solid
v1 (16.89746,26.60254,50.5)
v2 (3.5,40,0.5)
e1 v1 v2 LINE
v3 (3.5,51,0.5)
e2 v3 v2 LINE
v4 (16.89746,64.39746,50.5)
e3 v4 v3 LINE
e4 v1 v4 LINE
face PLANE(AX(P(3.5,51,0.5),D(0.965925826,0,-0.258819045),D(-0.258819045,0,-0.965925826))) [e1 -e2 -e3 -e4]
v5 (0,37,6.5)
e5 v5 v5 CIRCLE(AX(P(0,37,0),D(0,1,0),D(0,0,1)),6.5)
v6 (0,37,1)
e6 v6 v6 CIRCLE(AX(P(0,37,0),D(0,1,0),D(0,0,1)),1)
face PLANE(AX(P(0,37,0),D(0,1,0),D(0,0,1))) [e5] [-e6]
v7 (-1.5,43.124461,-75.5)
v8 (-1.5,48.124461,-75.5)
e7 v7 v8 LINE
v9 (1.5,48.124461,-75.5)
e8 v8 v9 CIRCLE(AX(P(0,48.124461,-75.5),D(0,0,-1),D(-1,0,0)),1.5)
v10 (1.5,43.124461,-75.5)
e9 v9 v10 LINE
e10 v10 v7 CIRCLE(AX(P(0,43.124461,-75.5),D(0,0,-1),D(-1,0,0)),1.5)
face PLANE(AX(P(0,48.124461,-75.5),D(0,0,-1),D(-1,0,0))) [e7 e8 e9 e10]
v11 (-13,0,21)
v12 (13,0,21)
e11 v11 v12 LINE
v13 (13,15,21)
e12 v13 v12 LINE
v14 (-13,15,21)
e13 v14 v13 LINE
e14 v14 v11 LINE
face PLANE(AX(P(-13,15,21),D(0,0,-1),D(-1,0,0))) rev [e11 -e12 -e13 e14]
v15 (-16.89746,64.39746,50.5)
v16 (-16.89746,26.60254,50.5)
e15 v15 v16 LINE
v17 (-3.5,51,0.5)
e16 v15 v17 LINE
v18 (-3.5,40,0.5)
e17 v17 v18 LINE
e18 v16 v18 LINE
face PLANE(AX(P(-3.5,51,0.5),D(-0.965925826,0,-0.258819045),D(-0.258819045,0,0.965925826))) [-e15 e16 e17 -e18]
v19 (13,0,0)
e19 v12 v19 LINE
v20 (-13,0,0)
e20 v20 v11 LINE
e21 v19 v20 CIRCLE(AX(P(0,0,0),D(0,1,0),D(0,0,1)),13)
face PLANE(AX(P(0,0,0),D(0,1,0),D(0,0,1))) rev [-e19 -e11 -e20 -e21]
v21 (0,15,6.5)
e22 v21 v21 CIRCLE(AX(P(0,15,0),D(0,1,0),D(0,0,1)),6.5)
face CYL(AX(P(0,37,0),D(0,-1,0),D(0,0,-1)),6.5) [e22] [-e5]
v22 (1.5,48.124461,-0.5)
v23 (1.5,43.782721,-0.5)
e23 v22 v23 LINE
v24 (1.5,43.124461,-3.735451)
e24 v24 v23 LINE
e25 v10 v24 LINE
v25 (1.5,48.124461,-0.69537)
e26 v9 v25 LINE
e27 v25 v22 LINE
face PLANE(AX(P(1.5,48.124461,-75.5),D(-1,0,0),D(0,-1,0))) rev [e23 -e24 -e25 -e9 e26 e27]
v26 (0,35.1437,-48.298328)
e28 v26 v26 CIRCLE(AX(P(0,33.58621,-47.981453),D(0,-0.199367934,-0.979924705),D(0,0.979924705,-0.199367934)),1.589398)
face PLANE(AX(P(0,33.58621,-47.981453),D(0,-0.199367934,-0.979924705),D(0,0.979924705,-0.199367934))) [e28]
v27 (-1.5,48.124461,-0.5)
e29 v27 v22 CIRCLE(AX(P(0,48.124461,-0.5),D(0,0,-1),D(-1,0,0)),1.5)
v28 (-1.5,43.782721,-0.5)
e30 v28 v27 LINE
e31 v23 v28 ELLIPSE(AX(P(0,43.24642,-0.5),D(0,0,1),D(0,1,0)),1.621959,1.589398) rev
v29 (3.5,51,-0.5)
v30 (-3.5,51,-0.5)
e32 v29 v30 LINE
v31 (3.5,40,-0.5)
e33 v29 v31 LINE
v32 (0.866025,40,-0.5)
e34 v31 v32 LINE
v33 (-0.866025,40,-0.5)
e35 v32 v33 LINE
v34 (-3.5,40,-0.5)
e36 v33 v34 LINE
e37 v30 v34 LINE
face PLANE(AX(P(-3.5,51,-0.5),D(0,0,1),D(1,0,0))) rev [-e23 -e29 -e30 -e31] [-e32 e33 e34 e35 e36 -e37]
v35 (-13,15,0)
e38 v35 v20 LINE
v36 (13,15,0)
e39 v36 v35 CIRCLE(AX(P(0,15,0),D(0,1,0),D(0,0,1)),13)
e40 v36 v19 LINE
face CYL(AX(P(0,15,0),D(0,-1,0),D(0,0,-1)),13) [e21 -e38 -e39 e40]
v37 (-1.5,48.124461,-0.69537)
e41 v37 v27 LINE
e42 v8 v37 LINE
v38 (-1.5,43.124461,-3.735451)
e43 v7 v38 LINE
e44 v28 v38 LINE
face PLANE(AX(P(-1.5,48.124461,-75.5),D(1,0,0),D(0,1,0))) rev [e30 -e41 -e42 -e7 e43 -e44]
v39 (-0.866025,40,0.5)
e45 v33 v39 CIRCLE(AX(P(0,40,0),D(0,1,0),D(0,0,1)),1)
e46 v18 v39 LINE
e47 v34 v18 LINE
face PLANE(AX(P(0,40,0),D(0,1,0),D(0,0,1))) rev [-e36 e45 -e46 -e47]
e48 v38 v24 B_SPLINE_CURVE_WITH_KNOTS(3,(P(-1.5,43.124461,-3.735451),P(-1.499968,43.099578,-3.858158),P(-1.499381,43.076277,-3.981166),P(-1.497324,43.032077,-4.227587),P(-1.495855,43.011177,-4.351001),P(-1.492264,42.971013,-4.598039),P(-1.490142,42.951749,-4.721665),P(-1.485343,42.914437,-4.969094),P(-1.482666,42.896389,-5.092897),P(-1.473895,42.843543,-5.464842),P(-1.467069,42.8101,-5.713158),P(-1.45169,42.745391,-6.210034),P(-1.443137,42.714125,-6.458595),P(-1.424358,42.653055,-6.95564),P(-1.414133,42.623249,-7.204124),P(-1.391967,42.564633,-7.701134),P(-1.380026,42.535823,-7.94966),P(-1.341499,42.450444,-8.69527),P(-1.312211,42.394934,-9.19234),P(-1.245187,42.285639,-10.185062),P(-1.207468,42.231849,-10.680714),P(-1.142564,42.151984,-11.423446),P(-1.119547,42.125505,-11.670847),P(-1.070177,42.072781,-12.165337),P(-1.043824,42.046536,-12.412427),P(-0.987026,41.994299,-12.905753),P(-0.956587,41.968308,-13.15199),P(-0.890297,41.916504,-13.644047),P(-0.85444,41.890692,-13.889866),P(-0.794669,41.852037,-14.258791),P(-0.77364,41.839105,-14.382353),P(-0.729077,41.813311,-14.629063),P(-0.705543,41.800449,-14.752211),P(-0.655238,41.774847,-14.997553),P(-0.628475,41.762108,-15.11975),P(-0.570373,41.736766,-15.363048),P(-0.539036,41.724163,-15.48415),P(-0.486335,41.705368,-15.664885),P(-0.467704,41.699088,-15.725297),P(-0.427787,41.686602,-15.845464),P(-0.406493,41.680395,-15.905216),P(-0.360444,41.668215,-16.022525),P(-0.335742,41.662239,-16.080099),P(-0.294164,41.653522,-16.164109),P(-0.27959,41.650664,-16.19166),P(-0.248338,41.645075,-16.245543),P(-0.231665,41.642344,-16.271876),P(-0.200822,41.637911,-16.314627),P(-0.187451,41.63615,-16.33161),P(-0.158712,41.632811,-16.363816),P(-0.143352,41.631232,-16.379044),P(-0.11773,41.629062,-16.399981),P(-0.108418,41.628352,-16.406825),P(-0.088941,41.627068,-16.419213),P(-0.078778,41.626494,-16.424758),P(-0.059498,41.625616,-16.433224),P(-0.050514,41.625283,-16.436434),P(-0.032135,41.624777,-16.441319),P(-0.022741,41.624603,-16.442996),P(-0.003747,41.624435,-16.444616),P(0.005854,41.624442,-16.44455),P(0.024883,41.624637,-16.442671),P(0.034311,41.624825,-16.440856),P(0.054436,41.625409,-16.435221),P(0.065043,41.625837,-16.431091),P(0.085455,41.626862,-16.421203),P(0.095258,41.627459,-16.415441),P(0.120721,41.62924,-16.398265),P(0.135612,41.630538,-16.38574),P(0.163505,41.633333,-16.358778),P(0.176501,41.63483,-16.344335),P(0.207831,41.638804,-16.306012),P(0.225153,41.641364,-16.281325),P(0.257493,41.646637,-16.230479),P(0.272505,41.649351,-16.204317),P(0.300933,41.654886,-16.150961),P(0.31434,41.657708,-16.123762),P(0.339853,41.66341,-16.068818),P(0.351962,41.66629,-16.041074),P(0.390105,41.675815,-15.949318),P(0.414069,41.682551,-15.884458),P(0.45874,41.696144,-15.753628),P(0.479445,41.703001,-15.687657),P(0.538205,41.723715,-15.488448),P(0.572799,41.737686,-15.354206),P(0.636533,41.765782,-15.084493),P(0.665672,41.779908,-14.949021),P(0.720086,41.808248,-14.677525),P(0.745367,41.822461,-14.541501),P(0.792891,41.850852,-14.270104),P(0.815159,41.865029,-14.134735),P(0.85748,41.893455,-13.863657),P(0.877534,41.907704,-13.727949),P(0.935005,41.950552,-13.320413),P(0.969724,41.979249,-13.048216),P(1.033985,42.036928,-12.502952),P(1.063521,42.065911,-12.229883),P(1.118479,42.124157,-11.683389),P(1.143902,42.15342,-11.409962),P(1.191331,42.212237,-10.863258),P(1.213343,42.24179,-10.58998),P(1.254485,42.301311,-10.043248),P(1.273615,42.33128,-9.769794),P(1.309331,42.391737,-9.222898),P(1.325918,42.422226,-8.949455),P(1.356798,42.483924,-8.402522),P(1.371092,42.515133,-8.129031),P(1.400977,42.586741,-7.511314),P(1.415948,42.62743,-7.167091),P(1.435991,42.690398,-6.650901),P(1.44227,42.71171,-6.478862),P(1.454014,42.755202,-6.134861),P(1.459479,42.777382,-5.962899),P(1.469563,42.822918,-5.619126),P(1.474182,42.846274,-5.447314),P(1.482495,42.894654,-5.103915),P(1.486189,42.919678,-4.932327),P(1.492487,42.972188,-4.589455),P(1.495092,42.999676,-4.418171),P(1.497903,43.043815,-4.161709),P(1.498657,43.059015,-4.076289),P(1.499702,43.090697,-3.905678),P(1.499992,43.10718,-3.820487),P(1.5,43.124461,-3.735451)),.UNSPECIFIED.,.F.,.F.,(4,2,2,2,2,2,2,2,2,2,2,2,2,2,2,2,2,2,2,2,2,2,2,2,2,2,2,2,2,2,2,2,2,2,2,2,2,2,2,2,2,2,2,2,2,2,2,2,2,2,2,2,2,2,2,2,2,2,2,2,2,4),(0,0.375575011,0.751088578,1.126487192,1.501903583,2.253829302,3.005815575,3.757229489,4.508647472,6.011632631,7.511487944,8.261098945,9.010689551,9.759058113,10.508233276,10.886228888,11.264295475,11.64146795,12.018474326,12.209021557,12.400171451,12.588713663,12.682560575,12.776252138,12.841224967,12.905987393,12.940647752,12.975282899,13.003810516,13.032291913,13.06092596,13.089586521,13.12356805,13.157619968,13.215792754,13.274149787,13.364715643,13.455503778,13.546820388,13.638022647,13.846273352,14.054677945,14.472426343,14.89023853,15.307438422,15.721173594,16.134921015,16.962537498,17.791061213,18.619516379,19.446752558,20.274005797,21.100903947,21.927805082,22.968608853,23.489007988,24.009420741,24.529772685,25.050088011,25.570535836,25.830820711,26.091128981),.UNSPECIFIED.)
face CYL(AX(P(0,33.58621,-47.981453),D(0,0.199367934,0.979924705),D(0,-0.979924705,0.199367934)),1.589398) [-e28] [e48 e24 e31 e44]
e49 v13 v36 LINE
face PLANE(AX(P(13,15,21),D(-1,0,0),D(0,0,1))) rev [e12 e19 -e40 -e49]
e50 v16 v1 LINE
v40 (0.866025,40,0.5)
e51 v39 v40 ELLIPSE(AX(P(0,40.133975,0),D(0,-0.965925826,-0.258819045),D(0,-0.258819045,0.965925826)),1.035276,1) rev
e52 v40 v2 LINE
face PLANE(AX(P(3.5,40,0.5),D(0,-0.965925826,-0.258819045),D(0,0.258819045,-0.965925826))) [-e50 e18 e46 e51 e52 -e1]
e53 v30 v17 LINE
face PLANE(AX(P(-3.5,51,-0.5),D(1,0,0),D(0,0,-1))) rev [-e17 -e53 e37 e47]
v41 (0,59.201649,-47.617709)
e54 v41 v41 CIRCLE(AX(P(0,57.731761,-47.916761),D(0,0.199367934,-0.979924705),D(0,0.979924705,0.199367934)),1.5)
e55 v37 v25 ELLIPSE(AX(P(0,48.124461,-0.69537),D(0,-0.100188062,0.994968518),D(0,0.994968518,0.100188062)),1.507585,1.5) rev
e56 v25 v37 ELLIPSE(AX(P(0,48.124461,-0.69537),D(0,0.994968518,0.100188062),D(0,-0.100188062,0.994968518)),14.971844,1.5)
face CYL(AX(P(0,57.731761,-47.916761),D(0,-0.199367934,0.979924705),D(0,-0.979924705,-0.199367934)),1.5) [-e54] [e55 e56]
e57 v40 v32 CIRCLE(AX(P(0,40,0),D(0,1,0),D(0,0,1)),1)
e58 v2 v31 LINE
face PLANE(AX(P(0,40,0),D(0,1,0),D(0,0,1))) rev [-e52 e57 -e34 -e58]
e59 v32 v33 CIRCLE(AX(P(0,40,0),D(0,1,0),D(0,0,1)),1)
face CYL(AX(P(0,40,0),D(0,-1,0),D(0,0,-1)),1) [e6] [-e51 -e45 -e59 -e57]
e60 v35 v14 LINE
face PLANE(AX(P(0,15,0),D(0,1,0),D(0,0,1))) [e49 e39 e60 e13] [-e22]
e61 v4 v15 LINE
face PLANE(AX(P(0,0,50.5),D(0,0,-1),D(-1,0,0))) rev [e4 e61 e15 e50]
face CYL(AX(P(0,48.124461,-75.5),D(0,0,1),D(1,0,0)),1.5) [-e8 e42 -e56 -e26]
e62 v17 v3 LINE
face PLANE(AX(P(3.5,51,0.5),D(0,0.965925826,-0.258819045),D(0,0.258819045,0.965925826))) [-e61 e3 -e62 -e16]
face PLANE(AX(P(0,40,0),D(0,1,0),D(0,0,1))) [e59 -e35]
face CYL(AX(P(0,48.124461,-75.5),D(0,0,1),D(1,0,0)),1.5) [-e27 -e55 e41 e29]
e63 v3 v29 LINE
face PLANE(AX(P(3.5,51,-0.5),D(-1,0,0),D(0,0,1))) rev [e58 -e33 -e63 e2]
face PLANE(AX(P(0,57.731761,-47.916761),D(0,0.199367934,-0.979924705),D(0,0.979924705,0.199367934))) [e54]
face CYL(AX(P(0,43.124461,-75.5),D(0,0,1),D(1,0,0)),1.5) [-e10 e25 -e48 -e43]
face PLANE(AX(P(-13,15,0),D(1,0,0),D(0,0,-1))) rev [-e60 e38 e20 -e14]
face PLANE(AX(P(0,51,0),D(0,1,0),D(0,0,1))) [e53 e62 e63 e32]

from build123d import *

# Parameters (mm, degrees)
BOSS_EXTRUDE1_DEPTH = 15
SKETCH2_R           = 6.5
BOSS_EXTRUDE2_DEPTH = 22
SKETCH3_R           = 1
BOSS_EXTRUDE3_DEPTH = 3
SKETCH4_W           = 7
SKETCH4_H           = 1
BOSS_EXTRUDE4_DEPTH = 11
SKETCH5_R           = 1.5
BOSS_EXTRUDE5_DEPTH = 20
BOSS_EXTRUDE6_DEPTH = 75
SKETCH7_R           = 1.589398049
BOSS_EXTRUDE7_DEPTH = 50
SKETCH8_R           = 1.5
BOSS_EXTRUDE8_DEPTH = 50
SKETCH9_W           = 7
SKETCH9_H           = 11
BOSS_EXTRUDE9_DEPTH = 50
BOSS_EXTRUDE9_TAPER = -15


with BuildPart() as part:
    # Sketch1 → Boss-Extrude1 (new body)
    with BuildSketch(Plane(origin=(0, 0, 0), x_dir=(1, 0, 0), z_dir=(0, 1, 0))):
        with BuildLine():
            Line((-13, 0), (-13, -21))
            Line((-13, -21), (13, -21))
            Line((13, -21), (13, 0))
            ThreePointArc((13, 0), (0, 13), (-13, 0))
        make_face()
    extrude(amount=BOSS_EXTRUDE1_DEPTH)

    # Sketch2 → Boss-Extrude2 (add)
    with BuildSketch(Plane(origin=(0, 15, 0), x_dir=(1, 0, 0), z_dir=(0, 1, 0))):
        Circle(SKETCH2_R)
    extrude(amount=BOSS_EXTRUDE2_DEPTH)

    # Sketch3 → Boss-Extrude3 (add)
    with BuildSketch(Plane(origin=(0, 37, 0), x_dir=(1, 0, 0), z_dir=(0, 1, 0))):
        Circle(SKETCH3_R)
    extrude(amount=BOSS_EXTRUDE3_DEPTH)

    # Sketch4 → Boss-Extrude4 (add)
    with BuildSketch(Plane(origin=(0, 40, 0), x_dir=(1, 0, 0), z_dir=(0, 1, 0))):
        Rectangle(SKETCH4_W, SKETCH4_H)
    extrude(amount=BOSS_EXTRUDE4_DEPTH)

    # Sketch5 → Boss-Extrude5 (add)
    with BuildSketch(Plane.XY.offset(0.5)):
        with Locations((0, 45.870127471)):
            Circle(SKETCH5_R)
    extrude(amount=BOSS_EXTRUDE5_DEPTH)

    # Sketch6 → Boss-Extrude6 (add)
    with BuildSketch(Plane(origin=(0, 0, -0.5), x_dir=(-1, 0, 0), z_dir=(0, 0, -1))):
        with BuildLine():
            Line((1.5, 48.124460967), (1.5, 43.124460967))
            ThreePointArc((1.5, 43.124460967), (0, 41.624460967), (-1.5, 43.124460967))
            Line((-1.5, 43.124460967), (-1.5, 48.124460967))
            ThreePointArc((-1.5, 48.124460967), (0, 49.624460967), (1.5, 48.124460967))
        make_face()
    extrude(amount=BOSS_EXTRUDE6_DEPTH)


with BuildPart() as boss_extrude7_tool:
    # Sketch7 → Boss-Extrude7 (new body)
    with BuildSketch(Plane(origin=(0, 1.929443455, 9.483517563), x_dir=(-1, 0, 0), z_dir=(0, -0.1993679344171976, -0.9799247046208295))):
        with Locations((0, 42.477919634)):
            Circle(SKETCH7_R)
    extrude(amount=BOSS_EXTRUDE7_DEPTH)


with BuildPart() as part_1:
    add(part.part)


with BuildPart() as part_2:
    # Boss-Extrude7: joined with boss_extrude7_tool
    add(part_1.part.fuse(boss_extrude7_tool.part, tol=0.00001))

    # Sketch8 → Boss-Extrude8 (add)
    with BuildSketch(Plane(origin=(0, 1.687585713, -8.294748783), x_dir=(-1, 0, 0), z_dir=(0, 0.1993679344171843, -0.9799247046208323))):
        with Locations((0, 47.019713669)):
            Circle(SKETCH8_R)
    extrude(amount=BOSS_EXTRUDE8_DEPTH)

    # Sketch9 → Boss-Extrude9 (add)
    with BuildSketch(Plane.XY.offset(0.5)):
        with Locations((0, 45.5)):
            Rectangle(SKETCH9_W, SKETCH9_H)
    extrude(amount=BOSS_EXTRUDE9_DEPTH, taper=BOSS_EXTRUDE9_TAPER)


solid = part_2.part
